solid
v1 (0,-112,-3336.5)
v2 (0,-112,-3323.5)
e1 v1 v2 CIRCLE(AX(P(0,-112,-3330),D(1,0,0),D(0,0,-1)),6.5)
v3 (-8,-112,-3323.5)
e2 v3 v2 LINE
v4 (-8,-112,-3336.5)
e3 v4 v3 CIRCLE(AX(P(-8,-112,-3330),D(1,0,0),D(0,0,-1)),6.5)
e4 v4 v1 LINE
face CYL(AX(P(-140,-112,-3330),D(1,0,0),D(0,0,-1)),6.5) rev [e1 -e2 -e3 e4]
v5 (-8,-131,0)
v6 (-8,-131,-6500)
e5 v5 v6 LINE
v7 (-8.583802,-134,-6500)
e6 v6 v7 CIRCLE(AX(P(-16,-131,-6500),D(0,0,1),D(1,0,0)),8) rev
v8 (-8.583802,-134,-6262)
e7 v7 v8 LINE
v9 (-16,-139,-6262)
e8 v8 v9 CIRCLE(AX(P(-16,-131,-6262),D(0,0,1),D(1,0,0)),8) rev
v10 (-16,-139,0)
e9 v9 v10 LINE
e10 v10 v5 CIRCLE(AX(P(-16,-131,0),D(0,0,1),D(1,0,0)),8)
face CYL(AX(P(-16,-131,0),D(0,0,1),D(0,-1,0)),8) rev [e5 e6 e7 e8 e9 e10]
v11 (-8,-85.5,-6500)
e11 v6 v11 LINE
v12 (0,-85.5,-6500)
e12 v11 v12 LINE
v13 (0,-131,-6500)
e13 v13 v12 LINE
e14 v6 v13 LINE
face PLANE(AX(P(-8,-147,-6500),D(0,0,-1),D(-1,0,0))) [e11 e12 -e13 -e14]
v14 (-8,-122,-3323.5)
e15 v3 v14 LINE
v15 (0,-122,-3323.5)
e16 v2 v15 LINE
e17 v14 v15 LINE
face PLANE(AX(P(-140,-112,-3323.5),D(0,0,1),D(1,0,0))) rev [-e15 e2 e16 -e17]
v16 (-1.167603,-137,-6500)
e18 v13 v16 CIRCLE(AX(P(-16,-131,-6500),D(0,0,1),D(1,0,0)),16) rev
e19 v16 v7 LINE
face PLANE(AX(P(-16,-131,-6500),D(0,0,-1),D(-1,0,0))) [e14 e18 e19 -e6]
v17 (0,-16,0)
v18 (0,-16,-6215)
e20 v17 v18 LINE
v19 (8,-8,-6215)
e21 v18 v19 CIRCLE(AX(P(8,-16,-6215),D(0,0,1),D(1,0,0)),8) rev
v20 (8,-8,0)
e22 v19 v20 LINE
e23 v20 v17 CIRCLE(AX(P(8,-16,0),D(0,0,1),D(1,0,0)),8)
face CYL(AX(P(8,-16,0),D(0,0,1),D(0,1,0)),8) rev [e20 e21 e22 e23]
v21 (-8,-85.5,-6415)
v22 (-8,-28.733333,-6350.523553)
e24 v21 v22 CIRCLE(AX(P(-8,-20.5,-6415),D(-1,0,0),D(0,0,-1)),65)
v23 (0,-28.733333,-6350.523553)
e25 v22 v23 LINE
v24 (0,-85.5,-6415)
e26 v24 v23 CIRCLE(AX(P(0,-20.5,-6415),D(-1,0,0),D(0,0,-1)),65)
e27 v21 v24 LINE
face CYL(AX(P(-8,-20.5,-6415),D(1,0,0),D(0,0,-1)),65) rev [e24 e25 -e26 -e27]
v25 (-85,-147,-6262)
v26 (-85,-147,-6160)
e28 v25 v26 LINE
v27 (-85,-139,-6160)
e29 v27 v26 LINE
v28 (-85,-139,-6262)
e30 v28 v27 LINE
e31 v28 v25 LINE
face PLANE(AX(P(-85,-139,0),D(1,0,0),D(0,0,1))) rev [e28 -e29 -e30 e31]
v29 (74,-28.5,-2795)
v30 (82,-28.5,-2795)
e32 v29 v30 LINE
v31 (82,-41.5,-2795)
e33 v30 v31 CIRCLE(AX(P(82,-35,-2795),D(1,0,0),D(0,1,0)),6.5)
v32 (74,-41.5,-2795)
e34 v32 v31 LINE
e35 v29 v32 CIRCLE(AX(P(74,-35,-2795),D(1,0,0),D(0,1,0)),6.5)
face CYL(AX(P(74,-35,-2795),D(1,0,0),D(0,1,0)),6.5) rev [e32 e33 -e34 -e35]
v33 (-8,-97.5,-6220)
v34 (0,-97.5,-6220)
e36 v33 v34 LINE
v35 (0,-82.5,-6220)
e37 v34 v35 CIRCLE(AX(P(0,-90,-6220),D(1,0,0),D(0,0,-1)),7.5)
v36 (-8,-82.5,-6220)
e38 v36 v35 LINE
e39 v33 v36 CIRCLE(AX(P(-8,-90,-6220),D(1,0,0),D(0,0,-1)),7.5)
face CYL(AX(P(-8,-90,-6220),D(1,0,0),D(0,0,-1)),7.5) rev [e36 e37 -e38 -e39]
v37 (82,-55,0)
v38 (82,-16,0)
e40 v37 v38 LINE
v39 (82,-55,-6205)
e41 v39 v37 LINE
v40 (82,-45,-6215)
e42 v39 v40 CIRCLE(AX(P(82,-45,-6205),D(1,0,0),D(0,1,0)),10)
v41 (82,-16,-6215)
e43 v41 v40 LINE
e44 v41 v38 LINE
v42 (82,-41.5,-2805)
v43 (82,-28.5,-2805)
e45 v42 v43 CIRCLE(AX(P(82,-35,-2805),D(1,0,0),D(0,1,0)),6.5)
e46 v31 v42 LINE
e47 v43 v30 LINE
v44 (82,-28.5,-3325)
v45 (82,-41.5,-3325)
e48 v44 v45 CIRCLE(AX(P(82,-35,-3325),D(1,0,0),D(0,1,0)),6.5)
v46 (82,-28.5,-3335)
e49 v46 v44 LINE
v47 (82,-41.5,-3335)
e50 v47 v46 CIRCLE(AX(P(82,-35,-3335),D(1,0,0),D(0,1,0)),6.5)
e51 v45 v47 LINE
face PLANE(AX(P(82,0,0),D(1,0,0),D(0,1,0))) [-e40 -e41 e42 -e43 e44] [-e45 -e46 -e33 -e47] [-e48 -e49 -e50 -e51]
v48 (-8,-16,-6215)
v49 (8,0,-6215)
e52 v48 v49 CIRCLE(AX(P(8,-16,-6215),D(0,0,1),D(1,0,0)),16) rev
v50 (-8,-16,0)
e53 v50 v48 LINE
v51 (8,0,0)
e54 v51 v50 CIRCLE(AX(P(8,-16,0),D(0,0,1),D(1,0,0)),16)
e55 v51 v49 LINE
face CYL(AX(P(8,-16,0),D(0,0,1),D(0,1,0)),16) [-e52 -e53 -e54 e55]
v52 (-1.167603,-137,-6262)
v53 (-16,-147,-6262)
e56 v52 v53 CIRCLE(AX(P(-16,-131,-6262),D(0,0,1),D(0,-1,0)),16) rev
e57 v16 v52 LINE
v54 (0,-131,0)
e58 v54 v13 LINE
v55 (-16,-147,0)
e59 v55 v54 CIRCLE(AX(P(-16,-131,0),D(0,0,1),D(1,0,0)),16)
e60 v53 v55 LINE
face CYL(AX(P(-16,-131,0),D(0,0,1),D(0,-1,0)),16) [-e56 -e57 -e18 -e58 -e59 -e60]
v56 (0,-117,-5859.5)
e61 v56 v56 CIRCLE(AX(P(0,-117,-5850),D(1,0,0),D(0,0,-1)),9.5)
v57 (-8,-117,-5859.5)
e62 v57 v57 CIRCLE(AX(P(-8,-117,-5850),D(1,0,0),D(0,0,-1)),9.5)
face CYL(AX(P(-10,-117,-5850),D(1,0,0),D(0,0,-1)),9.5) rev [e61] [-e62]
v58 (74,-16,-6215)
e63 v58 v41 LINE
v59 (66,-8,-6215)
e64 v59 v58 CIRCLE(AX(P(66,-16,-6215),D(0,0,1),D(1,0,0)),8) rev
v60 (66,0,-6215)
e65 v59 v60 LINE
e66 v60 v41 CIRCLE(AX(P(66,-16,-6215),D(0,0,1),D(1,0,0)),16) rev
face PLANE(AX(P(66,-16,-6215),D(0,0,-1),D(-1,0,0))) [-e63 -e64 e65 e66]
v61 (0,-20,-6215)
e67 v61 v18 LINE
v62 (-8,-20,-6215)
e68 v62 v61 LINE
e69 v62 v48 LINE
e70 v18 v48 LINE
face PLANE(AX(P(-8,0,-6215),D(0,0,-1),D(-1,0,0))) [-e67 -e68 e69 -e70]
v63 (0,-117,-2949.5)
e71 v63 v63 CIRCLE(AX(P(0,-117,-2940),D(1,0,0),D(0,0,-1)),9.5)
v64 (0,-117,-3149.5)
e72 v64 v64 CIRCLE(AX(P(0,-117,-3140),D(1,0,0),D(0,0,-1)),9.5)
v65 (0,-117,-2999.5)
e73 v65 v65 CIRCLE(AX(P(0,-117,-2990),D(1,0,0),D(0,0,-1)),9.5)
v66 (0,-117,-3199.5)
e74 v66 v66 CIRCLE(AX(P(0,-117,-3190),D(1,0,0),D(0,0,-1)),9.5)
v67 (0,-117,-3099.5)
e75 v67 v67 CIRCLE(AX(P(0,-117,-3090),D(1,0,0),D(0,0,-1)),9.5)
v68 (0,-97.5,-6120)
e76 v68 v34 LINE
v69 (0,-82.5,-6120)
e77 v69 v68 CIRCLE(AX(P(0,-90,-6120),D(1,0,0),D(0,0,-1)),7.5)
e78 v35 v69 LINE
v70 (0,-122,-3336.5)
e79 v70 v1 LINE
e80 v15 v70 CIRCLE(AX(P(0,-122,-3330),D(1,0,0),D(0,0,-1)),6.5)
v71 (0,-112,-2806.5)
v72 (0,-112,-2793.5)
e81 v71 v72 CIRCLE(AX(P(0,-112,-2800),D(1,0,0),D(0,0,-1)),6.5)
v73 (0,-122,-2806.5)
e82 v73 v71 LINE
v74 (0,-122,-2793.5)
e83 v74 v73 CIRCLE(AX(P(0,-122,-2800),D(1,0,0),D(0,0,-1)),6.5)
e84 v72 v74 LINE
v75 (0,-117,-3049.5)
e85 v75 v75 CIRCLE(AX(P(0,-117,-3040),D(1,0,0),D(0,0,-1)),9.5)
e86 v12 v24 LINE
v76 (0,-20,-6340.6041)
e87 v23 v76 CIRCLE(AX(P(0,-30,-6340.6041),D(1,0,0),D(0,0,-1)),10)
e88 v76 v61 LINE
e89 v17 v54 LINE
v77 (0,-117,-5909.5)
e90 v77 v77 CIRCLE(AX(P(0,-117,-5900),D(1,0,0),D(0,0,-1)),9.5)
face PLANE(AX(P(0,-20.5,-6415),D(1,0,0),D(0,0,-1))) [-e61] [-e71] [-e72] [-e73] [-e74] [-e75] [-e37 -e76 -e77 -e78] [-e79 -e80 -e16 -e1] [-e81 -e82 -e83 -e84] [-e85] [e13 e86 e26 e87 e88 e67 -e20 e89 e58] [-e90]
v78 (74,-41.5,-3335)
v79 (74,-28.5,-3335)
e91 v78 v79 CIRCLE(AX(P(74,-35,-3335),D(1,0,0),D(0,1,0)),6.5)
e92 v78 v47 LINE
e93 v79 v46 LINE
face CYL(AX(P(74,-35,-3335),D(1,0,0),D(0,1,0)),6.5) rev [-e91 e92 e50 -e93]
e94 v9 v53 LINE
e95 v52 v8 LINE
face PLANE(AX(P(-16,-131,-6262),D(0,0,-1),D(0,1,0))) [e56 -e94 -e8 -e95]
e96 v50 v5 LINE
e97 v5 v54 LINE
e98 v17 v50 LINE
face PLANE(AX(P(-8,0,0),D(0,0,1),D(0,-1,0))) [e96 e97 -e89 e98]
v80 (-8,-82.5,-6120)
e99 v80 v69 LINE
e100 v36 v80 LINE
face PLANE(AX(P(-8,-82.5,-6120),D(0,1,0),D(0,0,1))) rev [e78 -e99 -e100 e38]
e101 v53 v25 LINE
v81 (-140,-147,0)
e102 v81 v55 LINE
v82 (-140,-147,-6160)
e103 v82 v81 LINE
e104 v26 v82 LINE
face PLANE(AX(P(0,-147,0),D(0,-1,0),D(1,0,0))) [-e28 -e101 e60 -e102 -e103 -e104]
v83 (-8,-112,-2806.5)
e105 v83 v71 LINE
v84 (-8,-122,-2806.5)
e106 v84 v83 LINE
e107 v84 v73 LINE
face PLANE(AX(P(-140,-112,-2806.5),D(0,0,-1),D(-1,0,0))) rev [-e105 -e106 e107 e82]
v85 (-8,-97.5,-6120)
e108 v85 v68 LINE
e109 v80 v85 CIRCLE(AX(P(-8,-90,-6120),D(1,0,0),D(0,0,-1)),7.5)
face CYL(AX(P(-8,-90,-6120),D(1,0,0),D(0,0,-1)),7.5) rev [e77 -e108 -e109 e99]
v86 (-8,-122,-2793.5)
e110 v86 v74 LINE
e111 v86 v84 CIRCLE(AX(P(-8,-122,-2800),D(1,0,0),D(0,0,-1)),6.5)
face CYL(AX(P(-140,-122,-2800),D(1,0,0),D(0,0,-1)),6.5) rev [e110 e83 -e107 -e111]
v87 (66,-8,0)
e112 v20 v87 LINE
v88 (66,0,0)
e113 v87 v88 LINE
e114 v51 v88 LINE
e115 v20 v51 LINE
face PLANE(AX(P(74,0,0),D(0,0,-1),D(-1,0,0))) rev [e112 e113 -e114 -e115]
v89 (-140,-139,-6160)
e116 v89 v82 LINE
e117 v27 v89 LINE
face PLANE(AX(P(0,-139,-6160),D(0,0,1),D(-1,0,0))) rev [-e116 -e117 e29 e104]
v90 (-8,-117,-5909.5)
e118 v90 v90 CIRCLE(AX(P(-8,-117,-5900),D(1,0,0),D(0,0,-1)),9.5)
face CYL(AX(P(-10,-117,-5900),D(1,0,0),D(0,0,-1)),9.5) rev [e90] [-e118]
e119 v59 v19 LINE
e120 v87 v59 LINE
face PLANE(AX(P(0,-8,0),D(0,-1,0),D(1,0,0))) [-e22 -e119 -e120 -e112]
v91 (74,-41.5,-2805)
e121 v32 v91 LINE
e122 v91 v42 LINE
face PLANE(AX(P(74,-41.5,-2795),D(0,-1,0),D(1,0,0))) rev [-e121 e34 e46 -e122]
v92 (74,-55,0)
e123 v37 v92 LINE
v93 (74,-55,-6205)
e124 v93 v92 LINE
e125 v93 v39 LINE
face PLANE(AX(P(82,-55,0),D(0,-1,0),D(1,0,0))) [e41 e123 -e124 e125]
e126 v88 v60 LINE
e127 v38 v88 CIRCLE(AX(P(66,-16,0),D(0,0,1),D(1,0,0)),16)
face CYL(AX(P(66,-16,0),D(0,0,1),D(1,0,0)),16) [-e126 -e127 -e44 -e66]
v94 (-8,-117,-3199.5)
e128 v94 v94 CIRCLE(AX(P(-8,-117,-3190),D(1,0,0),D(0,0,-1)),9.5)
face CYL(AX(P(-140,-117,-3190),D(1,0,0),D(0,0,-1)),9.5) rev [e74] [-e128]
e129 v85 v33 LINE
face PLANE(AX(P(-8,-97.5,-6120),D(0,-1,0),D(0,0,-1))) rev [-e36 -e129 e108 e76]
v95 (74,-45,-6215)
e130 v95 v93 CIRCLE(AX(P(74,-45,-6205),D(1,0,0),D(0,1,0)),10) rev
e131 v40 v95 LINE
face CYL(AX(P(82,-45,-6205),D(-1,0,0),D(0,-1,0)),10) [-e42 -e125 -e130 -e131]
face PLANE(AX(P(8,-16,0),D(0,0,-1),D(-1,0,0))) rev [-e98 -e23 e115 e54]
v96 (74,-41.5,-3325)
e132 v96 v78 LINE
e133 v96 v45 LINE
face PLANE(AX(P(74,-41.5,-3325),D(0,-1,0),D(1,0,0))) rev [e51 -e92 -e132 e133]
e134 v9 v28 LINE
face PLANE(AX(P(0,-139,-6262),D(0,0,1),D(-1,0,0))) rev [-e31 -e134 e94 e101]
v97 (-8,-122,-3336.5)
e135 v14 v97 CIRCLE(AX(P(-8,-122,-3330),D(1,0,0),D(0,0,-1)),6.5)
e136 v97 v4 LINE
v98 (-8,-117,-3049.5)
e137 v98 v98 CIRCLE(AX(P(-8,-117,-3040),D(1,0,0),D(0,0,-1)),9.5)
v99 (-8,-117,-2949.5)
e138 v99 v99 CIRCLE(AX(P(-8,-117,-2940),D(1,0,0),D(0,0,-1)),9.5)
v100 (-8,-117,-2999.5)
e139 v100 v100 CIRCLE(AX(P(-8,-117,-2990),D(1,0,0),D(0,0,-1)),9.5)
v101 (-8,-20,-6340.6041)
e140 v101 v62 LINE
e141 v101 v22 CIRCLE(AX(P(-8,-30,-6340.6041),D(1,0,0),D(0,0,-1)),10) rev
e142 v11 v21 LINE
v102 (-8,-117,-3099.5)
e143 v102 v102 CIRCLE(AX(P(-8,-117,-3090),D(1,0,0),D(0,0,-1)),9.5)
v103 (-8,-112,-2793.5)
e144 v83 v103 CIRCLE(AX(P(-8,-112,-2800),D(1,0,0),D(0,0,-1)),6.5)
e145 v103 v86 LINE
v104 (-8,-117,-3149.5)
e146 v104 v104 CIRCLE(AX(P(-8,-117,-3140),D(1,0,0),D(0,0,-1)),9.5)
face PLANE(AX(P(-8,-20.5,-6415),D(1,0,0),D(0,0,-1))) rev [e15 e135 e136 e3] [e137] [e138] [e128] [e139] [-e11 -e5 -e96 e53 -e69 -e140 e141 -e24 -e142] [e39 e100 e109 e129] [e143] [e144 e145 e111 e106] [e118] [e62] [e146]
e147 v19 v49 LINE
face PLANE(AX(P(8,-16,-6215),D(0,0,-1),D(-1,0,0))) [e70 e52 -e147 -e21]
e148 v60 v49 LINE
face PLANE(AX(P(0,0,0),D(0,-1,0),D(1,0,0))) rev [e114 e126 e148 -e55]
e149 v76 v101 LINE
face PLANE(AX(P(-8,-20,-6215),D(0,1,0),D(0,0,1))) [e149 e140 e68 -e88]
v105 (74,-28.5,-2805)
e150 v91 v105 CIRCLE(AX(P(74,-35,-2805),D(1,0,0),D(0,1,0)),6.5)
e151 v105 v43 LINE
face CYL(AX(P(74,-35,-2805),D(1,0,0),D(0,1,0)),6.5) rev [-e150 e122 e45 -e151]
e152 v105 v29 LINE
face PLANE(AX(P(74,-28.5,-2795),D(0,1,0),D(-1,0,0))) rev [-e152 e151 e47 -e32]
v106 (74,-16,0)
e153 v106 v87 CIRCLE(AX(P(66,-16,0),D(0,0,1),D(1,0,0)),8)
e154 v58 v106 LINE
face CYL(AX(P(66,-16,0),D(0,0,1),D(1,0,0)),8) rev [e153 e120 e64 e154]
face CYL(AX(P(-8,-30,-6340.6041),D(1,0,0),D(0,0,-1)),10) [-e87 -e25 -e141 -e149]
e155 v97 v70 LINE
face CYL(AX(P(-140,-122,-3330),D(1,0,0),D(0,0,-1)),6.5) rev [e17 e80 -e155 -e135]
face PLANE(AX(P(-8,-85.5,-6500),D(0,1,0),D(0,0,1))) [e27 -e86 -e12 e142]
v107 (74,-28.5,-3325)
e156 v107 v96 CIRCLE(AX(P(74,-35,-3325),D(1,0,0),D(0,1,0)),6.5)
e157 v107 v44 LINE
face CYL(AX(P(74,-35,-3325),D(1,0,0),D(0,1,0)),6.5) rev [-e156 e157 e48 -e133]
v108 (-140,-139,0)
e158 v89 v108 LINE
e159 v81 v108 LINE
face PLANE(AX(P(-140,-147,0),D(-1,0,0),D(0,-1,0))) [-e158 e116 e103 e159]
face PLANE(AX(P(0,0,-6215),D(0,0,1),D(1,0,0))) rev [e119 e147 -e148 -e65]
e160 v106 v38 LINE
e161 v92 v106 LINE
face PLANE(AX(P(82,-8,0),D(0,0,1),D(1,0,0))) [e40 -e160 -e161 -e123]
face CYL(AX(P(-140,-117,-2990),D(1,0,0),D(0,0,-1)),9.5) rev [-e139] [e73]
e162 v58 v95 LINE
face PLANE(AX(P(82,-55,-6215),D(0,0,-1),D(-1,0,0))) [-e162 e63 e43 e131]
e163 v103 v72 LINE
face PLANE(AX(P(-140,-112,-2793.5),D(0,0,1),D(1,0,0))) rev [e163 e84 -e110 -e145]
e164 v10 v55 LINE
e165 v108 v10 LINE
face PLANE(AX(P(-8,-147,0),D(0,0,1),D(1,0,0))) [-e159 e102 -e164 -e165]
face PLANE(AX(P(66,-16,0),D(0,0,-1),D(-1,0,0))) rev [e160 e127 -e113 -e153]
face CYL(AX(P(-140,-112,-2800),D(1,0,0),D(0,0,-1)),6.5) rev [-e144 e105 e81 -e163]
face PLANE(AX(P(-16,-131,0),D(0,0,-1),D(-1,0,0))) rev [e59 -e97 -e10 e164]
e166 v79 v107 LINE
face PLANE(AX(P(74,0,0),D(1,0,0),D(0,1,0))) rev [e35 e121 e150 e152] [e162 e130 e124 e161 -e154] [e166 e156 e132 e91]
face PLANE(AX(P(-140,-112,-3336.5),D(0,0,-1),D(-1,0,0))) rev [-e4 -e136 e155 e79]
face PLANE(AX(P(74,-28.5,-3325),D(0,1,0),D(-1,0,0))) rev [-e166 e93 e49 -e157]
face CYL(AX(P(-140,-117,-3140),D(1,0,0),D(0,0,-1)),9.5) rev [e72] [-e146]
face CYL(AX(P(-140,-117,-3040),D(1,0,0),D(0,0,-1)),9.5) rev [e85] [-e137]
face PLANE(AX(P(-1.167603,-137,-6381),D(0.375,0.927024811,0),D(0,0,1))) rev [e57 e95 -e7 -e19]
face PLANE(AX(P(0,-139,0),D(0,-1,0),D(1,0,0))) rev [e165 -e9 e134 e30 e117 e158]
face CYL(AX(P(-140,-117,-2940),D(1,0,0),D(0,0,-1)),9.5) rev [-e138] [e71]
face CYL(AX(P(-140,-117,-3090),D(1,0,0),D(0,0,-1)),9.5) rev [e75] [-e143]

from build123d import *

# Parameters (mm, degrees)
SM_BASE_FLANGE_1_DEPTH           = 8
SM_EDGE_FLANGE_1_STRIP_W         = 48
SM_EDGE_FLANGE_1_STRIP_H         = 8
SM_EDGE_FLANGE_1_STRIP_CUT_DEPTH = 6215
SM_EDGE_FLANGE_1_DEPTH           = 6215
SM_EDGE_FLANGE_2_STRIP_W         = 48
SM_EDGE_FLANGE_2_STRIP_H         = 8
SM_EDGE_FLANGE_2_STRIP_CUT_DEPTH = 6215
SM_EDGE_FLANGE_2_DEPTH           = 6215
SM_EDGE_FLANGE_3_STRIP_W         = 48
SM_EDGE_FLANGE_3_STRIP_H         = 8
SM_EDGE_FLANGE_3_STRIP_CUT_DEPTH = 6500
SM_EDGE_FLANGE_3_DEPTH           = 6500
FILLET_1_R                       = 10
SKETCH_15_R                      = 9.5
CUT_EXTRUDE_1_DEPTH              = 6504.169150499
CUT_EXTRUDE_2_DEPTH              = 10
SKETCH_17_R                      = 9.5
CUT_EXTRUDE_3_DEPTH              = 10
CUT_EXTRUDE_START                = -6500
CUT_EXTRUDE_4_DEPTH              = 238
CUT_EXTRUDE_START_2              = -6262
CUT_EXTRUDE_4_2_OUTLINE_W        = 55
CUT_EXTRUDE_4_2_OUTLINE_H        = 8
CUT_EXTRUDE_4_2_DEPTH            = 102


# Read off the part's stored shape, not the designer's step: 切除-拉伸4
# Sheet-metal steps are written as plain solids
with BuildPart() as part:
    # Sketch 1 → 基体-法兰1 (new body)
    with BuildSketch(Plane(origin=(0, 0, 0), x_dir=(0, 0, -1), z_dir=(1, 0, 0))):
        with BuildLine():
            Line((0, 0), (6215, 0))
            Line((6215, 0), (6215, -20))
            Line((6215, -20), (6350.001923105, -20))
            ThreePointArc((6350.001923105, -20), (6368.861621181, -66.284822813), (6415, -85.5))
            Line((6415, -85.5), (6500, -85.5))
            Line((6500, -85.5), (6500, -147))
            Line((6500, -147), (0, -147))
            Line((0, -147), (0, 0))
        make_face()
        with BuildLine():
            Line((6120, -82.5), (6220, -82.5))
            ThreePointArc((6220, -82.5), (6227.5, -90), (6220, -97.5))
            Line((6220, -97.5), (6120, -97.5))
            ThreePointArc((6120, -97.5), (6112.5, -90), (6120, -82.5))
        make_face(mode=Mode.SUBTRACT)
    extrude(amount=-SM_BASE_FLANGE_1_DEPTH)

    # 边线-法兰1 strip (across the edge) → 边线-法兰1 strip cut (cut)
    with BuildSketch(Plane(origin=(0, 0, -6215), x_dir=(0, -1, 0), z_dir=(0, 0, 1))):
        with Locations((-8, -4)):
            Rectangle(SM_EDGE_FLANGE_1_STRIP_W, SM_EDGE_FLANGE_1_STRIP_H)
    extrude(amount=SM_EDGE_FLANGE_1_STRIP_CUT_DEPTH, mode=Mode.SUBTRACT)

    # 边线-法兰1 section (across the edge) → 边线-法兰1 (add)
    with BuildSketch(Plane(origin=(0, 0, -6215), x_dir=(0, -1, 0), z_dir=(0, 0, 1))):
        with BuildLine():
            Line((0, 8), (0, 74))
            Line((0, 74), (8, 74))
            Line((8, 74), (8, 8))
            ThreePointArc((8, 8), (10.343145751, 2.343145751), (16, 0))
            Line((16, 0), (16, -8))
            ThreePointArc((16, -8), (4.686291501, -3.313708499), (0, 8))
        make_face()
    extrude(amount=SM_EDGE_FLANGE_1_DEPTH)

    # 边线-法兰2 strip (across the edge) → 边线-法兰2 strip cut (cut)
    with BuildSketch(Plane(origin=(74, -8, -6215), x_dir=(-1, 0, 0), z_dir=(0, 0, 1))):
        with Locations((-16, -4)):
            Rectangle(SM_EDGE_FLANGE_2_STRIP_W, SM_EDGE_FLANGE_2_STRIP_H)
    extrude(amount=SM_EDGE_FLANGE_2_STRIP_CUT_DEPTH, mode=Mode.SUBTRACT)

    # 边线-法兰2 section (across the edge) → 边线-法兰2 (add)
    with BuildSketch(Plane(origin=(74, -8, -6215), x_dir=(-1, 0, 0), z_dir=(0, 0, 1))):
        with BuildLine():
            Line((-8, 8), (-8, 47))
            Line((-8, 47), (0, 47))
            Line((0, 47), (0, 8))
            ThreePointArc((0, 8), (2.343145751, 2.343145751), (8, 0))
            Line((8, 0), (8, -8))
            ThreePointArc((8, -8), (-3.313708499, -3.313708499), (-8, 8))
        make_face()
    extrude(amount=SM_EDGE_FLANGE_2_DEPTH)

    # 边线-法兰3 strip (across the edge) → 边线-法兰3 strip cut (cut)
    with BuildSketch(Plane(origin=(-8, -147, -6500), x_dir=(0, 1, 0), z_dir=(0, 0, 1))):
        with Locations((-8, -4)):
            Rectangle(SM_EDGE_FLANGE_3_STRIP_W, SM_EDGE_FLANGE_3_STRIP_H)
    extrude(amount=SM_EDGE_FLANGE_3_STRIP_CUT_DEPTH, mode=Mode.SUBTRACT)

    # 边线-法兰3 section (across the edge) → 边线-法兰3 (add)
    with BuildSketch(Plane(origin=(-8, -147, -6500), x_dir=(0, 1, 0), z_dir=(0, 0, 1))):
        with BuildLine():
            Line((0, 8), (0, 132))
            Line((0, 132), (8, 132))
            Line((8, 132), (8, 8))
            ThreePointArc((8, 8), (10.343145751, 2.343145751), (16, 0))
            Line((16, 0), (16, -8))
            ThreePointArc((16, -8), (4.686291501, -3.313708499), (0, 8))
        make_face()
    extrude(amount=SM_EDGE_FLANGE_3_DEPTH)

    # 圆角1
    fillet_1_edges = [part.edges().sort_by_distance(p)[0] for p in [
        (78, -55, -6215),
        (-4, -20, -6350.001923105),
    ]]
    fillet(fillet_1_edges, radius=FILLET_1_R)

    # 草图15 → 切除-拉伸1 (cut, through all)
    with BuildSketch(Plane(origin=(0, 0, 0), x_dir=(0, 0, -1), z_dir=(1, 0, 0))):
        with Locations((3040, -117)):
            Circle(SKETCH_15_R)
        with Locations((3090, -117)):
            Circle(SKETCH_15_R)
        with Locations((3140, -117)):
            Circle(SKETCH_15_R)
        with Locations((3190, -117)):
            Circle(SKETCH_15_R)
        with Locations((2990, -117)):
            Circle(SKETCH_15_R)
        with Locations((2940, -117)):
            Circle(SKETCH_15_R)
        with BuildLine():
            Line((2806.5, -112), (2806.5, -122))
            ThreePointArc((2806.5, -122), (2800, -128.5), (2793.5, -122))
            Line((2793.5, -122), (2793.5, -112))
            ThreePointArc((2793.5, -112), (2800, -105.5), (2806.5, -112))
        make_face()
        with BuildLine():
            Line((3336.5, -112), (3336.5, -122))
            ThreePointArc((3336.5, -122), (3330, -128.5), (3323.5, -122))
            Line((3323.5, -122), (3323.5, -112))
            ThreePointArc((3323.5, -112), (3330, -105.5), (3336.5, -112))
        make_face()
    extrude(amount=-CUT_EXTRUDE_1_DEPTH, mode=Mode.SUBTRACT)

    # 草图16 → 切除-拉伸2 (cut)
    with BuildSketch(Plane(origin=(82, 0, 0), x_dir=(0, 0, -1), z_dir=(1, 0, 0))):
        with BuildLine():
            Line((2795, -28.5), (2805, -28.5))
            ThreePointArc((2805, -28.5), (2811.5, -35), (2805, -41.5))
            Line((2805, -41.5), (2795, -41.5))
            ThreePointArc((2795, -41.5), (2788.5, -35), (2795, -28.5))
        make_face()
        with BuildLine():
            Line((3325, -28.5), (3335, -28.5))
            ThreePointArc((3335, -28.5), (3341.5, -35), (3335, -41.5))
            Line((3335, -41.5), (3325, -41.5))
            ThreePointArc((3325, -41.5), (3318.5, -35), (3325, -28.5))
        make_face()
    extrude(amount=-CUT_EXTRUDE_2_DEPTH, mode=Mode.SUBTRACT)

    # 草图17 → 切除-拉伸3 (cut)
    with BuildSketch(Plane(origin=(0, 0, 0), x_dir=(0, 0, -1), z_dir=(1, 0, 0))):
        with Locations((5900, -117)):
            Circle(SKETCH_17_R)
        with Locations((5850, -117)):
            Circle(SKETCH_17_R)
    extrude(amount=-CUT_EXTRUDE_3_DEPTH, mode=Mode.SUBTRACT)

    # 切除-拉伸4 outline → 切除-拉伸4 (cut)
    with BuildSketch(Plane.XY.offset(CUT_EXTRUDE_START)):
        with BuildLine():
            Line((-140, -147), (-16, -147))
            ThreePointArc((-16, -147), (-7.05572809, -144.266499161), (-1.167603026, -137))
            Line((-1.167603026, -137), (-8.583801513, -134))
            ThreePointArc((-8.583801513, -134), (-11.527864045, -137.63324958), (-16, -139))
            Line((-16, -139), (-140, -139))
            Line((-140, -139), (-140, -147))
        make_face()
    extrude(amount=CUT_EXTRUDE_4_DEPTH, mode=Mode.SUBTRACT)

    # Cut-Extrude 4 2 outline → Cut-Extrude 4 2 (cut)
    with BuildSketch(Plane.XY.offset(CUT_EXTRUDE_START_2)):
        with Locations((-112.5, -143)):
            Rectangle(CUT_EXTRUDE_4_2_OUTLINE_W, CUT_EXTRUDE_4_2_OUTLINE_H)
    extrude(amount=CUT_EXTRUDE_4_2_DEPTH, mode=Mode.SUBTRACT)


solid = part.part
